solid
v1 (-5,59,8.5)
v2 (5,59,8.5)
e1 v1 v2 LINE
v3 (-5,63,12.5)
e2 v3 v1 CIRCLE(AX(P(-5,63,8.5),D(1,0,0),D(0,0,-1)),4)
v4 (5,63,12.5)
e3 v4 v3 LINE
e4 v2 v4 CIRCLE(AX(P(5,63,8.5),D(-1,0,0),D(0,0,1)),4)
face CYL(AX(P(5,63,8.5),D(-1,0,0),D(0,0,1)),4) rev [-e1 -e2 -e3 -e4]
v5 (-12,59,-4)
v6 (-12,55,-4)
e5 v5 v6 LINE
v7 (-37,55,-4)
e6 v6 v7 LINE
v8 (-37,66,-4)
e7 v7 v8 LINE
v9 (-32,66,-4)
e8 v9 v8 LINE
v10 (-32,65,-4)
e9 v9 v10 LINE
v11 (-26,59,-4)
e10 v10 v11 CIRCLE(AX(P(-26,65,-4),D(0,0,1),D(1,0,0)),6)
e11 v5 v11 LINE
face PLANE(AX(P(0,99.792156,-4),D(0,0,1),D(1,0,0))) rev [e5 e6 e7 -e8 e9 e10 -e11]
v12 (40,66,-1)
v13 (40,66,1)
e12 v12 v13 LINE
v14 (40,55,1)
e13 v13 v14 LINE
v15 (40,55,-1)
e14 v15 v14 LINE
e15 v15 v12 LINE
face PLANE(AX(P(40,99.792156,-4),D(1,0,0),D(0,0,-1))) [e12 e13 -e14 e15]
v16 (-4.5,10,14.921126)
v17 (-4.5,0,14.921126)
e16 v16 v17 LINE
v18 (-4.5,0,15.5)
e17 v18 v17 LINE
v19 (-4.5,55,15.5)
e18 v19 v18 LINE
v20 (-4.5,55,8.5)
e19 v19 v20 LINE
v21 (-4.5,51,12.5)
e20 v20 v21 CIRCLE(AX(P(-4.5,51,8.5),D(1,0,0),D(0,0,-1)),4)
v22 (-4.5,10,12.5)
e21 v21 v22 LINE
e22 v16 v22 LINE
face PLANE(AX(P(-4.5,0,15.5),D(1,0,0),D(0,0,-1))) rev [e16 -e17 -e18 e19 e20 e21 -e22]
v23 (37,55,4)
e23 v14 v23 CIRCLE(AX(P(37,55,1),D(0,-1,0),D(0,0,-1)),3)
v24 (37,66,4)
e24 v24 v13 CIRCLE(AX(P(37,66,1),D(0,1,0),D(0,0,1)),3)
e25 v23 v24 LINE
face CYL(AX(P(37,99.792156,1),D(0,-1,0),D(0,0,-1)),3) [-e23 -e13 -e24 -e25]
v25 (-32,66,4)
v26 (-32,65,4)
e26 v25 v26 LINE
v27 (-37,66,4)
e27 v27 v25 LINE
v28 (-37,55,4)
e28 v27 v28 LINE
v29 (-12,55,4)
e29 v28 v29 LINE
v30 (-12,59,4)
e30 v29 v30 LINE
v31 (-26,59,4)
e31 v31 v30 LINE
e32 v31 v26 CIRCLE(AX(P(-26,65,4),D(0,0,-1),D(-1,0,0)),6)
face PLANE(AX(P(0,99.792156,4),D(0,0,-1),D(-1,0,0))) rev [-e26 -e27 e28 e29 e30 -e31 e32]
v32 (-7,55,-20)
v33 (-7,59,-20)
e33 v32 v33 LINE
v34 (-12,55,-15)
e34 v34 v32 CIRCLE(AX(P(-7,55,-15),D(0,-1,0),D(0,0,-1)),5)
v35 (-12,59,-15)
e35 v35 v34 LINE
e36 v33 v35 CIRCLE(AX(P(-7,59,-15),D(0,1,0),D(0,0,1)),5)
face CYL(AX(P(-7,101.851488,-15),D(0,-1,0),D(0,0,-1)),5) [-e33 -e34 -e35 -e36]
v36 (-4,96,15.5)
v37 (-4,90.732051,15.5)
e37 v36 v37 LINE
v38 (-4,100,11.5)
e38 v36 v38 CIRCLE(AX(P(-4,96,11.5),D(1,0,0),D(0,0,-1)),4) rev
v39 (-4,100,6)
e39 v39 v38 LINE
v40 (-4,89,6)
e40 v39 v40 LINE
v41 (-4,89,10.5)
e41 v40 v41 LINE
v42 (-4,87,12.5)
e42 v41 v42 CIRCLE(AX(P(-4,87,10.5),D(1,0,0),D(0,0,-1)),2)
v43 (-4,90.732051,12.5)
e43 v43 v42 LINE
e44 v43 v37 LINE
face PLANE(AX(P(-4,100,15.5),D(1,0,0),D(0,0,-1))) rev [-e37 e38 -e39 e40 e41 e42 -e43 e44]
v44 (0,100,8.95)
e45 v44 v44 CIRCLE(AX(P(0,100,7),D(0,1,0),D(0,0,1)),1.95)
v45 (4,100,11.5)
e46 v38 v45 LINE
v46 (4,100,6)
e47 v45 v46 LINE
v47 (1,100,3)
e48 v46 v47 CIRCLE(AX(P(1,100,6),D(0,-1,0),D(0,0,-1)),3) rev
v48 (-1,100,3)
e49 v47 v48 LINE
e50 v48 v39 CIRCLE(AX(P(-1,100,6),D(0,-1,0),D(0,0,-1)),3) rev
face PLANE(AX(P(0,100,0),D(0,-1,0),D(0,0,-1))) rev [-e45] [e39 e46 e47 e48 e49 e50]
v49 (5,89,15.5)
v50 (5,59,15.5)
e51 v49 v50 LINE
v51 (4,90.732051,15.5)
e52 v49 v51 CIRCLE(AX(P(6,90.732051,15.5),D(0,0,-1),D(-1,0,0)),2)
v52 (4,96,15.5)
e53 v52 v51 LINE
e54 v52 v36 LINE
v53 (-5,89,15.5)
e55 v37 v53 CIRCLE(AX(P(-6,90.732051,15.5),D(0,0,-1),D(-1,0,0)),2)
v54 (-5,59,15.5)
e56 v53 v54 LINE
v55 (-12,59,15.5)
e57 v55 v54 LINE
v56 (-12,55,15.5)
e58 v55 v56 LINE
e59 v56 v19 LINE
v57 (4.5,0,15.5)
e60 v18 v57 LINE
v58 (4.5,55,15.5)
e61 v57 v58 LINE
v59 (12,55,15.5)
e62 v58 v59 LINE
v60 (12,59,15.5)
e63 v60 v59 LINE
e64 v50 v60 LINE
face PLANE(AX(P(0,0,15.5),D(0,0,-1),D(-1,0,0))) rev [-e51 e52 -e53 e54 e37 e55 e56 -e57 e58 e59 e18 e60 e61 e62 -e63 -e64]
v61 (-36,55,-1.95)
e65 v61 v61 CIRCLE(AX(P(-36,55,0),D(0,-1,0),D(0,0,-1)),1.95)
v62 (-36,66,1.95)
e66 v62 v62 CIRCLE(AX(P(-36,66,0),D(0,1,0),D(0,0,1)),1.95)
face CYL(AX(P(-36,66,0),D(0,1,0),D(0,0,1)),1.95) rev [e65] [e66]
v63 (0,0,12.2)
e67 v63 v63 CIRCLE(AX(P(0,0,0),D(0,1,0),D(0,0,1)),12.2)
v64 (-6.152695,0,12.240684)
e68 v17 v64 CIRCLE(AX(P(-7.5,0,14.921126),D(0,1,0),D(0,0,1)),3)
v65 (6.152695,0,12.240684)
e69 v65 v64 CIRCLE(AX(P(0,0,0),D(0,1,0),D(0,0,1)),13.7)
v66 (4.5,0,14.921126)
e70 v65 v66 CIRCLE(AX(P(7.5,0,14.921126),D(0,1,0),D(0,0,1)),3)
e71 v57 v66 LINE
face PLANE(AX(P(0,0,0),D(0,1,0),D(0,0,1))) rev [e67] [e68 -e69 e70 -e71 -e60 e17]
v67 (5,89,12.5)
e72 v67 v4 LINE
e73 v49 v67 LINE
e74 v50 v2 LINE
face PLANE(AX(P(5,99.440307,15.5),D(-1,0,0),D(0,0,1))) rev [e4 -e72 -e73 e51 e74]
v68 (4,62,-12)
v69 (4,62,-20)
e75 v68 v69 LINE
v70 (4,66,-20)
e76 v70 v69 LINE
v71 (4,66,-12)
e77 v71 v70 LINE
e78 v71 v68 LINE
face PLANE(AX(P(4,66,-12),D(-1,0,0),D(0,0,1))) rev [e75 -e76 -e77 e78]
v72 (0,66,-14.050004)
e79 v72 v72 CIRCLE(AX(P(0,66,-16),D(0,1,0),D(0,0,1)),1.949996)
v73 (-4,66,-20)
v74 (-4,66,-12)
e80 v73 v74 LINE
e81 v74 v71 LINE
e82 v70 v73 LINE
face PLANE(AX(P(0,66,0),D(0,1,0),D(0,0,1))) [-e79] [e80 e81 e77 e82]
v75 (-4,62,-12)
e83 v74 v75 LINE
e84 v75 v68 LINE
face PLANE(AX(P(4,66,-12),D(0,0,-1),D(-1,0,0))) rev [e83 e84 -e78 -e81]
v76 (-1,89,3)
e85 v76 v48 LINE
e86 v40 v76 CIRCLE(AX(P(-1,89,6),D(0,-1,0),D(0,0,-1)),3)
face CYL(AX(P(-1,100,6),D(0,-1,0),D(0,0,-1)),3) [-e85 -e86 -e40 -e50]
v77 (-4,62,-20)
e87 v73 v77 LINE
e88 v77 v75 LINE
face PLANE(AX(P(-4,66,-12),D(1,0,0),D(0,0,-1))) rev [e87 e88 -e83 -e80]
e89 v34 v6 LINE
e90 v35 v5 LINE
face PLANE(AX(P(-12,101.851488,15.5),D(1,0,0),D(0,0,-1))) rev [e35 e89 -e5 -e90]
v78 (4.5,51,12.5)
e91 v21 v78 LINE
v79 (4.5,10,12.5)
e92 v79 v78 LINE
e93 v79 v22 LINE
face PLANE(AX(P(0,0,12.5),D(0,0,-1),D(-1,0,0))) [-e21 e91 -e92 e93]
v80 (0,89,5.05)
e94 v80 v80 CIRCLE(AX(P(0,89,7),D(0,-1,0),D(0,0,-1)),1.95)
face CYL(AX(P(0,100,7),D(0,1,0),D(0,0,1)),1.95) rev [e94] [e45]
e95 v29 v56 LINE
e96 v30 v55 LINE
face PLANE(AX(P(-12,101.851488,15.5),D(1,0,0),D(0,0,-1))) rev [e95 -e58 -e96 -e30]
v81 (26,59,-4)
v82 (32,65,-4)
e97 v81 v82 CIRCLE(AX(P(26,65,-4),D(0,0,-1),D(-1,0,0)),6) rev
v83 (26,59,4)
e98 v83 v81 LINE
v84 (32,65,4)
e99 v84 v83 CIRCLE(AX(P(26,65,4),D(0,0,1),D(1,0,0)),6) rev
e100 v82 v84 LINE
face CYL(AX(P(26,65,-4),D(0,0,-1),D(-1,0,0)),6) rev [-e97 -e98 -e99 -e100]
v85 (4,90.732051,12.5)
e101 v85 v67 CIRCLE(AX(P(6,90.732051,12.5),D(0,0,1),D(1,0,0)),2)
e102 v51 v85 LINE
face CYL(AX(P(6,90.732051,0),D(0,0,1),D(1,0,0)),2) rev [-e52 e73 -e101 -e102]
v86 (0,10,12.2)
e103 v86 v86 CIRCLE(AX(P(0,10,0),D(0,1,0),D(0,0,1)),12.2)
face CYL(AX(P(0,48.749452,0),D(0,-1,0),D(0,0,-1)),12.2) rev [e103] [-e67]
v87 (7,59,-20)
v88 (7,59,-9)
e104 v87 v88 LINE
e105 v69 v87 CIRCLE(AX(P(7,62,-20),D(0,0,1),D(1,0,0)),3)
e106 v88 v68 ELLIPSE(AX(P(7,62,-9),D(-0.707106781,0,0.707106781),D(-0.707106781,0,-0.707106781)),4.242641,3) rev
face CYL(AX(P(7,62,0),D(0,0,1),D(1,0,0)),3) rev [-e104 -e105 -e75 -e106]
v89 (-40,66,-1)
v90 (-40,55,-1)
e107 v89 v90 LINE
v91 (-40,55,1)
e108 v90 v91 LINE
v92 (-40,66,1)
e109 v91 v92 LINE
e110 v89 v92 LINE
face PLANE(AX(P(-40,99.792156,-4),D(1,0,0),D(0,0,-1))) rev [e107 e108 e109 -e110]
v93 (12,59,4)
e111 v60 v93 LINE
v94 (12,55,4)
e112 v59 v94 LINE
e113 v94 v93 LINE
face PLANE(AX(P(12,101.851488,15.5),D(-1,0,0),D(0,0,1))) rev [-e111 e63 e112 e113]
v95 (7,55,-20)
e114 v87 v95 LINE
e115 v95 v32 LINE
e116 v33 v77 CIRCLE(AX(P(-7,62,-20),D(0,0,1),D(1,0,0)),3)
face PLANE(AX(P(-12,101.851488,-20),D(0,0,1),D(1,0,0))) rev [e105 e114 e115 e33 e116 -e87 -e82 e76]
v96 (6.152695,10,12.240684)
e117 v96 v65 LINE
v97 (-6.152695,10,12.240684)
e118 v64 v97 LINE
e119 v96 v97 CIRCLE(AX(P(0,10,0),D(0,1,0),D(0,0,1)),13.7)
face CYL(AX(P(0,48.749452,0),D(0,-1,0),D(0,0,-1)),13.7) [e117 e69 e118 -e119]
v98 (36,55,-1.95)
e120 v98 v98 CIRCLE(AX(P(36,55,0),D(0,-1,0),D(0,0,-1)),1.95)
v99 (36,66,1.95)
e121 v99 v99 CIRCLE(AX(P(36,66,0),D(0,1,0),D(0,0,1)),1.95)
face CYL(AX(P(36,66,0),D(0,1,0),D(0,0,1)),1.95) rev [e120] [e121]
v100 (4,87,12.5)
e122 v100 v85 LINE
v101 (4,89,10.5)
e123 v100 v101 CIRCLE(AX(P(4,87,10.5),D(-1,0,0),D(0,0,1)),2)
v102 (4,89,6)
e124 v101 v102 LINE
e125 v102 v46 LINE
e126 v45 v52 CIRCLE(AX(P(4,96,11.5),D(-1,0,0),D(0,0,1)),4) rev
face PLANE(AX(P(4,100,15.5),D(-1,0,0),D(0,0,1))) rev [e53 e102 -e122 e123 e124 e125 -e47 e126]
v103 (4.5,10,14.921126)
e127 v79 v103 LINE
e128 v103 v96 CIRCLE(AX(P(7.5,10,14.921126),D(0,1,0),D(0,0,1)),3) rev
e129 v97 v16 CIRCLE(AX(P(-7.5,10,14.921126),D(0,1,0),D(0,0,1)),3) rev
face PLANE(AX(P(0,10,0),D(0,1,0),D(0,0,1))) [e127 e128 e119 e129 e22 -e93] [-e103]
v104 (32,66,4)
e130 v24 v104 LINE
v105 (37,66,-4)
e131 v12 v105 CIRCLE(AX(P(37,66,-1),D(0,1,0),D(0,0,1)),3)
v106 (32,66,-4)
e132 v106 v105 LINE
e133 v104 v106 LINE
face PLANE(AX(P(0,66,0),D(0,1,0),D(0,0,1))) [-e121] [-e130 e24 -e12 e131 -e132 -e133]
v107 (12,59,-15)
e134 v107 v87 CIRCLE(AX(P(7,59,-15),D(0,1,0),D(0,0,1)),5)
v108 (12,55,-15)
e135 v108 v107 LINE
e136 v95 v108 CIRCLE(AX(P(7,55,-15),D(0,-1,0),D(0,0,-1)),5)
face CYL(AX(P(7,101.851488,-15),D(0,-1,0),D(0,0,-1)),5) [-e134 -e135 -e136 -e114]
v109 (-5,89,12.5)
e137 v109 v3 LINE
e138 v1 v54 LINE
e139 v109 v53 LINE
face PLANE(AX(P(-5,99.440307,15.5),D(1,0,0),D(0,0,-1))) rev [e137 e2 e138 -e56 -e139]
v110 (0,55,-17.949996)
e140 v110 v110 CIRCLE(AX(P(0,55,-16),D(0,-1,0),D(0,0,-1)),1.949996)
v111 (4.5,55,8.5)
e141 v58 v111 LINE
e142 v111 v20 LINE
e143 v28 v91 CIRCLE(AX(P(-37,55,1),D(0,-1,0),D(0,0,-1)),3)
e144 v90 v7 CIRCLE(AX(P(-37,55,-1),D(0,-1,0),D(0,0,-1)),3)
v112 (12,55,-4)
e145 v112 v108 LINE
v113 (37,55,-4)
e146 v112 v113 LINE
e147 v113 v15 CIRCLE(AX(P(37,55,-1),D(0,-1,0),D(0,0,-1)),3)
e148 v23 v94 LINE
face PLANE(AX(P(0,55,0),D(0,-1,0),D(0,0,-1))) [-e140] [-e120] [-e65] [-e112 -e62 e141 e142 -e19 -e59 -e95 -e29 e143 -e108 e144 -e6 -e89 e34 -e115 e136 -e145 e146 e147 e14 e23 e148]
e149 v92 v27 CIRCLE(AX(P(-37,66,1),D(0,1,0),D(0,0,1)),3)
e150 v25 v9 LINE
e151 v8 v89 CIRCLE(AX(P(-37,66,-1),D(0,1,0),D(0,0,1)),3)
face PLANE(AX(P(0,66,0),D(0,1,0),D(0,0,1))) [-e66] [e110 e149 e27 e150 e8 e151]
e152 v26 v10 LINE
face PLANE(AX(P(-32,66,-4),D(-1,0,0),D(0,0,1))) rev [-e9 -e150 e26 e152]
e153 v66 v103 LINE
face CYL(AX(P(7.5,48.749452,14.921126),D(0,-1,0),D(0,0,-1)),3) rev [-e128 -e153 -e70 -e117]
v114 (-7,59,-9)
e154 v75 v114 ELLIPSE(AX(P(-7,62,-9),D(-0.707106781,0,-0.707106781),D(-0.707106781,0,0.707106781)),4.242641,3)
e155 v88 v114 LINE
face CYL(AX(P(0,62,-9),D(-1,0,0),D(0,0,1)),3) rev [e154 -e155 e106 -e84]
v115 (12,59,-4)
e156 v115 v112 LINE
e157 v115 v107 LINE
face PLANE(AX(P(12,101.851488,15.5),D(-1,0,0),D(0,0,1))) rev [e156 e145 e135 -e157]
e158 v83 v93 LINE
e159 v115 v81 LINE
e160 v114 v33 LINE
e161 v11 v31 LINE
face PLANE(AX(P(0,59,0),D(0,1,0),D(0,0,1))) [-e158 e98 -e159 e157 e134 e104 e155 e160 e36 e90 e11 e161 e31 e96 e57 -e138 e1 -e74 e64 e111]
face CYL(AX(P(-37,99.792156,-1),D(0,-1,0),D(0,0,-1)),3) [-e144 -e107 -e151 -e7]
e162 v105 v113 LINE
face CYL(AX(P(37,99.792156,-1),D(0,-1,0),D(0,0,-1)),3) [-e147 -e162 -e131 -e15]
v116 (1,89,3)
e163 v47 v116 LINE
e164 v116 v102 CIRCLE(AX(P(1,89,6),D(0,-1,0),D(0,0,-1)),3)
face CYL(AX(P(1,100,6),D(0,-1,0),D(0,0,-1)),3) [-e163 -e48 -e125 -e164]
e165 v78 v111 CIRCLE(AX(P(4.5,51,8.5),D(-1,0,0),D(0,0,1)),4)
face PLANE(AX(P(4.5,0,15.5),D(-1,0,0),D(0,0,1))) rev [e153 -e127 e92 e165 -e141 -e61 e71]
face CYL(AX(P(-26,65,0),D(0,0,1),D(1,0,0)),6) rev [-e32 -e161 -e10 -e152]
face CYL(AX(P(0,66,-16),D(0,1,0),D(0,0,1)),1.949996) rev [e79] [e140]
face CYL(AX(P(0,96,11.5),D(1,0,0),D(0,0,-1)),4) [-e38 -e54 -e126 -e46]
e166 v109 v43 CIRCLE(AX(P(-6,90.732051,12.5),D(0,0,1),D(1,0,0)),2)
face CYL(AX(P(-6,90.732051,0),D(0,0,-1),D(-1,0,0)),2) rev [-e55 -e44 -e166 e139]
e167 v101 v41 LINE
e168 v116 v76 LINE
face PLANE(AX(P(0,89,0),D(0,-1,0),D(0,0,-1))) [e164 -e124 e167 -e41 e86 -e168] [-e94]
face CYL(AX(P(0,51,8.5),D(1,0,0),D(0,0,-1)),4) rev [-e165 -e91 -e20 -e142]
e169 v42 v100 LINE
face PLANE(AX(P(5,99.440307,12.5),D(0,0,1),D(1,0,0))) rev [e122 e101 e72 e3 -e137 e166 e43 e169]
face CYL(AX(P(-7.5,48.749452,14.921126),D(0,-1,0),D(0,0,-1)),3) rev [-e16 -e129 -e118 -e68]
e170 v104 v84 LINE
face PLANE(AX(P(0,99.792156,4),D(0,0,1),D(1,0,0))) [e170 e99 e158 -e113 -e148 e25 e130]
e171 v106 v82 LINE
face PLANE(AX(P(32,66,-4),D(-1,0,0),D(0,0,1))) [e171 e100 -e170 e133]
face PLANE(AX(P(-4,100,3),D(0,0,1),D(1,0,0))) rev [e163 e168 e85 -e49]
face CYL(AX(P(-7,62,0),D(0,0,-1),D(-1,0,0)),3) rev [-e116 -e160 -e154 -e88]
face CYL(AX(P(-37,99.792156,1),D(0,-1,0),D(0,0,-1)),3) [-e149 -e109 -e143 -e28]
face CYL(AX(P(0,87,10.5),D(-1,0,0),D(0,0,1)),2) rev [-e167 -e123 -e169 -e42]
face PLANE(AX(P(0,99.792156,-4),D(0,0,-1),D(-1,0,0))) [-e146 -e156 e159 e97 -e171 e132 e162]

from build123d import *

# Parameters (mm, degrees)
SKETCH_1_R             = 13.7
SKETCH_1_R_2           = 12.2
EXTRUDE_1_DEPTH        = 10
SKETCH_3_W             = 9
SKETCH_3_H             = 55
EXTRUDE_2_DEPTH        = 3
SKETCH_4_W             = 24
SKETCH_4_H             = 35.5
EXTRUDE_3_DEPTH        = 4
FILLET_1_R             = 4
SKETCH_5_W             = 40
SKETCH_5_H             = 8
EXTRUDE_4_DEPTH        = 4
SKETCH_6_W             = 8
SKETCH_6_H             = 8
EXTRUDE_5_DEPTH        = 11
FILLET_2_R             = 6
HOLE_WIZARD_0_1_D      = 3.900000074
FILLET_2_OF_MIRROR_1_R = 6
SKETCH_11_W            = 8
SKETCH_11_H            = 8
EXTRUDE_6_DEPTH        = 11
HOLE_WIZARD_0_2_D      = 3.8999922
FILLET_3_R             = 3
FILLET_4_R             = 3
FILLET_5_R             = 3
SKETCH_14_W            = 10
SKETCH_14_H            = 3
EXTRUDE_7_DEPTH        = 30
FILLET_6_R             = 4
SKETCH_16_W            = 8
SKETCH_16_H            = 12.5
EXTRUDE_8_DEPTH        = 11
FILLET_7_R             = 4
FILLET_8_R             = 2
FILLET_9_R             = 2
FILLET_10_R            = 2
HOLE_WIZARD_0_3_D      = 3.900000074
HOLE_WIZARD_0_3_DEPTH  = 11
FILLET_11_R            = 5
FILLET_12_R            = 5
FILLET_13_R            = 3
FILLET_14_R            = 3
FILLET_15_R            = 3
FILLET_16_R            = 3
FILLET_17_R            = 3
FILLET_18_R            = 3
FILLET_19_R            = 3
FILLET_20_R            = 3


with BuildPart() as part:
    # ｽｹｯﾁ1 → ﾎﾞｽ - 押し出し1 (new body)
    with BuildSketch(Plane(origin=(0, 0, 0), x_dir=(1, 0, 0), z_dir=(0, 1, 0))):
        with Locations(Location((0, 0, 0), (0, 0, 270))):
            Circle(SKETCH_1_R)
        with Locations(Location((0, 0, 0), (0, 0, 270))):
            Circle(SKETCH_1_R_2, mode=Mode.SUBTRACT)
    extrude(amount=EXTRUDE_1_DEPTH)

    # ｽｹｯﾁ3 → ﾎﾞｽ - 押し出し2 (add)
    with BuildSketch(Plane.XY.offset(12.5)):
        with Locations((0, 27.5)):
            Rectangle(SKETCH_3_W, SKETCH_3_H)
    extrude(amount=EXTRUDE_2_DEPTH)

    # ｽｹｯﾁ4 → ﾎﾞｽ - 押し出し3 (add)
    with BuildSketch(Plane(origin=(0, 55, 0), x_dir=(1, 0, 0), z_dir=(0, 1, 0))):
        with Locations((0, 2.25)):
            Rectangle(SKETCH_4_W, SKETCH_4_H)
    extrude(amount=EXTRUDE_3_DEPTH)

    # ﾌｨﾚｯﾄ1
    fillet_1_edges = [part.edges().sort_by_distance(p)[0] for p in [
        (0, 55, 12.5),
    ]]
    fillet(fillet_1_edges, radius=FILLET_1_R)

    # ｽｹｯﾁ5 → ﾎﾞｽ - 押し出し4 (add)
    with BuildSketch(Plane(origin=(0, 55, 0), x_dir=(1, 0, 0), z_dir=(0, 1, 0))):
        with Locations((-20, 0)):
            Rectangle(SKETCH_5_W, SKETCH_5_H)
    extrude_4 = extrude(amount=EXTRUDE_4_DEPTH)

    # ｽｹｯﾁ6 → ﾎﾞｽ - 押し出し5 (add)
    with BuildSketch(Plane(origin=(0, 55, 0), x_dir=(1, 0, 0), z_dir=(0, 1, 0))):
        with Locations((-36, 0)):
            Rectangle(SKETCH_6_W, SKETCH_6_H)
    extrude_5 = extrude(amount=EXTRUDE_5_DEPTH)

    # ﾌｨﾚｯﾄ2
    fillet_2_edges = [part.edges().sort_by_distance(p)[0] for p in [
        (-32, 59, 0),
    ]]
    fillet(fillet_2_edges, radius=FILLET_2_R)

    # #0 すきま穴1 (through all)
    with Locations(Plane(origin=(0, 66, 0), x_dir=(1, 0, 0), z_dir=(0, 1, 0))):
        with Locations((-36, 0)):
            hole_wizard_0_1 = Hole(HOLE_WIZARD_0_1_D / 2)

    # ﾐﾗｰ1: ﾎﾞｽ - 押し出し4, ﾎﾞｽ - 押し出し5, #0 すきま穴1 across plane
    add(extrude_4.mirror(Plane(origin=(0, 0, 0), x_dir=(0, 0, 1), z_dir=(1, 0, 0))))
    add(extrude_5.mirror(Plane(origin=(0, 0, 0), x_dir=(0, 0, 1), z_dir=(1, 0, 0))))
    add(hole_wizard_0_1.mirror(Plane(origin=(0, 0, 0), x_dir=(0, 0, 1), z_dir=(1, 0, 0))), mode=Mode.SUBTRACT)

    # ﾌｨﾚｯﾄ2 of ﾐﾗｰ1
    fillet_2_of_mirror_1_edges = [part.edges().sort_by_distance(p)[0] for p in [
        (32, 59, 0),
    ]]
    fillet(fillet_2_of_mirror_1_edges, radius=FILLET_2_OF_MIRROR_1_R)

    # ｽｹｯﾁ11 → ﾎﾞｽ - 押し出し6 (add)
    with BuildSketch(Plane(origin=(0, 55, 0), x_dir=(1, 0, 0), z_dir=(0, 1, 0))):
        with Locations((0, 16)):
            Rectangle(SKETCH_11_W, SKETCH_11_H)
    extrude(amount=EXTRUDE_6_DEPTH)

    # #0 すきま穴2 (through all)
    with Locations(Plane(origin=(0, 66, 0), x_dir=(1, 0, 0), z_dir=(0, 1, 0))):
        with Locations((0, 16)):
            Hole(HOLE_WIZARD_0_2_D / 2)

    # ﾌｨﾚｯﾄ3
    fillet_3_edges = [part.edges().sort_by_distance(p)[0] for p in [
        (0, 59, -12),
    ]]
    fillet(fillet_3_edges, radius=FILLET_3_R)

    # ﾌｨﾚｯﾄ4
    fillet_4_edges = [part.edges().sort_by_distance(p)[0] for p in [
        (-4, 59, -14.5),
    ]]
    fillet(fillet_4_edges, radius=FILLET_4_R)

    # ﾌｨﾚｯﾄ5
    fillet_5_edges = [part.edges().sort_by_distance(p)[0] for p in [
        (4, 59, -14.5),
    ]]
    fillet(fillet_5_edges, radius=FILLET_5_R)

    # ｽｹｯﾁ14 → ﾎﾞｽ - 押し出し7 (add)
    with BuildSketch(Plane(origin=(0, 59, 0), x_dir=(1, 0, 0), z_dir=(0, 1, 0))):
        with Locations((0, -14)):
            Rectangle(SKETCH_14_W, SKETCH_14_H)
    extrude(amount=EXTRUDE_7_DEPTH)

    # ﾌｨﾚｯﾄ6
    fillet_6_edges = [part.edges().sort_by_distance(p)[0] for p in [
        (0, 59, 12.5),
    ]]
    fillet(fillet_6_edges, radius=FILLET_6_R)

    # ｽｹｯﾁ16 → ﾎﾞｽ - 押し出し8 (add)
    with BuildSketch(Plane(origin=(0, 89, 0), x_dir=(1, 0, 0), z_dir=(0, 1, 0))):
        with Locations((0, -9.25)):
            Rectangle(SKETCH_16_W, SKETCH_16_H)
    extrude(amount=EXTRUDE_8_DEPTH)

    # ﾌｨﾚｯﾄ7
    fillet_7_edges = [part.edges().sort_by_distance(p)[0] for p in [
        (0, 100, 15.5),
    ]]
    fillet(fillet_7_edges, radius=FILLET_7_R)

    # ﾌｨﾚｯﾄ8
    fillet_8_edges = [part.edges().sort_by_distance(p)[0] for p in [
        (0, 89, 12.5),
    ]]
    fillet(fillet_8_edges, radius=FILLET_8_R)

    # ﾌｨﾚｯﾄ9
    # the kernel refuses this fillet: 2 mm, written as the material it adds along each edge
    with BuildSketch(Plane(origin=(4, 89, 15.5), x_dir=(0, 1, 0), z_dir=(0, 0, -1))) as fillet_9_piece_1:
        with BuildLine():
            CenterArc((1.732050808, 2), FILLET_9_R, 210, 60)
            Line((0, 1), (0, 0))
            Line((0, 0), (1.732050808, 0))
        make_face()
    extrude(amount=3)

    # ﾌｨﾚｯﾄ10
    # the kernel refuses this fillet: 2 mm, written as the material it adds along each edge
    with BuildSketch(Plane(origin=(-4, 89, 12.5), x_dir=(-1, 0, 0), z_dir=(0, 0, 1))) as fillet_10_piece_1:
        with BuildLine():
            CenterArc((2, -1.732050808), FILLET_10_R, 120, 60)
            Line((0, -1.732050808), (0, 0))
            Line((0, 0), (1, 0))
        make_face()
    extrude(amount=3)

    # #0 すきま穴3
    with Locations(Plane(origin=(0, 100, 0), x_dir=(1, 0, 0), z_dir=(0, 1, 0))):
        with Locations((0, -7)):
            Hole(HOLE_WIZARD_0_3_D / 2, depth=HOLE_WIZARD_0_3_DEPTH)

    # ﾌｨﾚｯﾄ11
    fillet_11_edges = [part.edges().sort_by_distance(p)[0] for p in [
        (12, 57, -20),
    ]]
    fillet(fillet_11_edges, radius=FILLET_11_R)

    # ﾌｨﾚｯﾄ12
    fillet_12_edges = [part.edges().sort_by_distance(p)[0] for p in [
        (-12, 57, -20),
    ]]
    fillet(fillet_12_edges, radius=FILLET_12_R)

    # ﾌｨﾚｯﾄ13
    fillet_13_edges = [part.edges().sort_by_distance(p)[0] for p in [
        (-40, 60.5, -4),
    ]]
    fillet(fillet_13_edges, radius=FILLET_13_R)

    # ﾌｨﾚｯﾄ14
    fillet_14_edges = [part.edges().sort_by_distance(p)[0] for p in [
        (-40, 60.5, 4),
    ]]
    fillet(fillet_14_edges, radius=FILLET_14_R)

    # ﾌｨﾚｯﾄ15
    fillet_15_edges = [part.edges().sort_by_distance(p)[0] for p in [
        (40, 60.5, -4),
    ]]
    fillet(fillet_15_edges, radius=FILLET_15_R)

    # ﾌｨﾚｯﾄ16
    fillet_16_edges = [part.edges().sort_by_distance(p)[0] for p in [
        (40, 60.5, 4),
    ]]
    fillet(fillet_16_edges, radius=FILLET_16_R)

    # ﾌｨﾚｯﾄ17
    fillet_17_edges = [part.edges().sort_by_distance(p)[0] for p in [
        (4, 94.5, 3),
    ]]
    fillet(fillet_17_edges, radius=FILLET_17_R)

    # ﾌｨﾚｯﾄ18
    fillet_18_edges = [part.edges().sort_by_distance(p)[0] for p in [
        (-4, 94.5, 3),
    ]]
    fillet(fillet_18_edges, radius=FILLET_18_R)

    # ﾌｨﾚｯﾄ19
    fillet_19_edges = [part.edges().sort_by_distance(p)[0] for p in [
        (4.5, 5, 12.939860896),
    ]]
    fillet(fillet_19_edges, radius=FILLET_19_R)

    # ﾌｨﾚｯﾄ20
    fillet_20_edges = [part.edges().sort_by_distance(p)[0] for p in [
        (-4.5, 5, 12.939860896),
    ]]
    fillet(fillet_20_edges, radius=FILLET_20_R)


solid = part.part
